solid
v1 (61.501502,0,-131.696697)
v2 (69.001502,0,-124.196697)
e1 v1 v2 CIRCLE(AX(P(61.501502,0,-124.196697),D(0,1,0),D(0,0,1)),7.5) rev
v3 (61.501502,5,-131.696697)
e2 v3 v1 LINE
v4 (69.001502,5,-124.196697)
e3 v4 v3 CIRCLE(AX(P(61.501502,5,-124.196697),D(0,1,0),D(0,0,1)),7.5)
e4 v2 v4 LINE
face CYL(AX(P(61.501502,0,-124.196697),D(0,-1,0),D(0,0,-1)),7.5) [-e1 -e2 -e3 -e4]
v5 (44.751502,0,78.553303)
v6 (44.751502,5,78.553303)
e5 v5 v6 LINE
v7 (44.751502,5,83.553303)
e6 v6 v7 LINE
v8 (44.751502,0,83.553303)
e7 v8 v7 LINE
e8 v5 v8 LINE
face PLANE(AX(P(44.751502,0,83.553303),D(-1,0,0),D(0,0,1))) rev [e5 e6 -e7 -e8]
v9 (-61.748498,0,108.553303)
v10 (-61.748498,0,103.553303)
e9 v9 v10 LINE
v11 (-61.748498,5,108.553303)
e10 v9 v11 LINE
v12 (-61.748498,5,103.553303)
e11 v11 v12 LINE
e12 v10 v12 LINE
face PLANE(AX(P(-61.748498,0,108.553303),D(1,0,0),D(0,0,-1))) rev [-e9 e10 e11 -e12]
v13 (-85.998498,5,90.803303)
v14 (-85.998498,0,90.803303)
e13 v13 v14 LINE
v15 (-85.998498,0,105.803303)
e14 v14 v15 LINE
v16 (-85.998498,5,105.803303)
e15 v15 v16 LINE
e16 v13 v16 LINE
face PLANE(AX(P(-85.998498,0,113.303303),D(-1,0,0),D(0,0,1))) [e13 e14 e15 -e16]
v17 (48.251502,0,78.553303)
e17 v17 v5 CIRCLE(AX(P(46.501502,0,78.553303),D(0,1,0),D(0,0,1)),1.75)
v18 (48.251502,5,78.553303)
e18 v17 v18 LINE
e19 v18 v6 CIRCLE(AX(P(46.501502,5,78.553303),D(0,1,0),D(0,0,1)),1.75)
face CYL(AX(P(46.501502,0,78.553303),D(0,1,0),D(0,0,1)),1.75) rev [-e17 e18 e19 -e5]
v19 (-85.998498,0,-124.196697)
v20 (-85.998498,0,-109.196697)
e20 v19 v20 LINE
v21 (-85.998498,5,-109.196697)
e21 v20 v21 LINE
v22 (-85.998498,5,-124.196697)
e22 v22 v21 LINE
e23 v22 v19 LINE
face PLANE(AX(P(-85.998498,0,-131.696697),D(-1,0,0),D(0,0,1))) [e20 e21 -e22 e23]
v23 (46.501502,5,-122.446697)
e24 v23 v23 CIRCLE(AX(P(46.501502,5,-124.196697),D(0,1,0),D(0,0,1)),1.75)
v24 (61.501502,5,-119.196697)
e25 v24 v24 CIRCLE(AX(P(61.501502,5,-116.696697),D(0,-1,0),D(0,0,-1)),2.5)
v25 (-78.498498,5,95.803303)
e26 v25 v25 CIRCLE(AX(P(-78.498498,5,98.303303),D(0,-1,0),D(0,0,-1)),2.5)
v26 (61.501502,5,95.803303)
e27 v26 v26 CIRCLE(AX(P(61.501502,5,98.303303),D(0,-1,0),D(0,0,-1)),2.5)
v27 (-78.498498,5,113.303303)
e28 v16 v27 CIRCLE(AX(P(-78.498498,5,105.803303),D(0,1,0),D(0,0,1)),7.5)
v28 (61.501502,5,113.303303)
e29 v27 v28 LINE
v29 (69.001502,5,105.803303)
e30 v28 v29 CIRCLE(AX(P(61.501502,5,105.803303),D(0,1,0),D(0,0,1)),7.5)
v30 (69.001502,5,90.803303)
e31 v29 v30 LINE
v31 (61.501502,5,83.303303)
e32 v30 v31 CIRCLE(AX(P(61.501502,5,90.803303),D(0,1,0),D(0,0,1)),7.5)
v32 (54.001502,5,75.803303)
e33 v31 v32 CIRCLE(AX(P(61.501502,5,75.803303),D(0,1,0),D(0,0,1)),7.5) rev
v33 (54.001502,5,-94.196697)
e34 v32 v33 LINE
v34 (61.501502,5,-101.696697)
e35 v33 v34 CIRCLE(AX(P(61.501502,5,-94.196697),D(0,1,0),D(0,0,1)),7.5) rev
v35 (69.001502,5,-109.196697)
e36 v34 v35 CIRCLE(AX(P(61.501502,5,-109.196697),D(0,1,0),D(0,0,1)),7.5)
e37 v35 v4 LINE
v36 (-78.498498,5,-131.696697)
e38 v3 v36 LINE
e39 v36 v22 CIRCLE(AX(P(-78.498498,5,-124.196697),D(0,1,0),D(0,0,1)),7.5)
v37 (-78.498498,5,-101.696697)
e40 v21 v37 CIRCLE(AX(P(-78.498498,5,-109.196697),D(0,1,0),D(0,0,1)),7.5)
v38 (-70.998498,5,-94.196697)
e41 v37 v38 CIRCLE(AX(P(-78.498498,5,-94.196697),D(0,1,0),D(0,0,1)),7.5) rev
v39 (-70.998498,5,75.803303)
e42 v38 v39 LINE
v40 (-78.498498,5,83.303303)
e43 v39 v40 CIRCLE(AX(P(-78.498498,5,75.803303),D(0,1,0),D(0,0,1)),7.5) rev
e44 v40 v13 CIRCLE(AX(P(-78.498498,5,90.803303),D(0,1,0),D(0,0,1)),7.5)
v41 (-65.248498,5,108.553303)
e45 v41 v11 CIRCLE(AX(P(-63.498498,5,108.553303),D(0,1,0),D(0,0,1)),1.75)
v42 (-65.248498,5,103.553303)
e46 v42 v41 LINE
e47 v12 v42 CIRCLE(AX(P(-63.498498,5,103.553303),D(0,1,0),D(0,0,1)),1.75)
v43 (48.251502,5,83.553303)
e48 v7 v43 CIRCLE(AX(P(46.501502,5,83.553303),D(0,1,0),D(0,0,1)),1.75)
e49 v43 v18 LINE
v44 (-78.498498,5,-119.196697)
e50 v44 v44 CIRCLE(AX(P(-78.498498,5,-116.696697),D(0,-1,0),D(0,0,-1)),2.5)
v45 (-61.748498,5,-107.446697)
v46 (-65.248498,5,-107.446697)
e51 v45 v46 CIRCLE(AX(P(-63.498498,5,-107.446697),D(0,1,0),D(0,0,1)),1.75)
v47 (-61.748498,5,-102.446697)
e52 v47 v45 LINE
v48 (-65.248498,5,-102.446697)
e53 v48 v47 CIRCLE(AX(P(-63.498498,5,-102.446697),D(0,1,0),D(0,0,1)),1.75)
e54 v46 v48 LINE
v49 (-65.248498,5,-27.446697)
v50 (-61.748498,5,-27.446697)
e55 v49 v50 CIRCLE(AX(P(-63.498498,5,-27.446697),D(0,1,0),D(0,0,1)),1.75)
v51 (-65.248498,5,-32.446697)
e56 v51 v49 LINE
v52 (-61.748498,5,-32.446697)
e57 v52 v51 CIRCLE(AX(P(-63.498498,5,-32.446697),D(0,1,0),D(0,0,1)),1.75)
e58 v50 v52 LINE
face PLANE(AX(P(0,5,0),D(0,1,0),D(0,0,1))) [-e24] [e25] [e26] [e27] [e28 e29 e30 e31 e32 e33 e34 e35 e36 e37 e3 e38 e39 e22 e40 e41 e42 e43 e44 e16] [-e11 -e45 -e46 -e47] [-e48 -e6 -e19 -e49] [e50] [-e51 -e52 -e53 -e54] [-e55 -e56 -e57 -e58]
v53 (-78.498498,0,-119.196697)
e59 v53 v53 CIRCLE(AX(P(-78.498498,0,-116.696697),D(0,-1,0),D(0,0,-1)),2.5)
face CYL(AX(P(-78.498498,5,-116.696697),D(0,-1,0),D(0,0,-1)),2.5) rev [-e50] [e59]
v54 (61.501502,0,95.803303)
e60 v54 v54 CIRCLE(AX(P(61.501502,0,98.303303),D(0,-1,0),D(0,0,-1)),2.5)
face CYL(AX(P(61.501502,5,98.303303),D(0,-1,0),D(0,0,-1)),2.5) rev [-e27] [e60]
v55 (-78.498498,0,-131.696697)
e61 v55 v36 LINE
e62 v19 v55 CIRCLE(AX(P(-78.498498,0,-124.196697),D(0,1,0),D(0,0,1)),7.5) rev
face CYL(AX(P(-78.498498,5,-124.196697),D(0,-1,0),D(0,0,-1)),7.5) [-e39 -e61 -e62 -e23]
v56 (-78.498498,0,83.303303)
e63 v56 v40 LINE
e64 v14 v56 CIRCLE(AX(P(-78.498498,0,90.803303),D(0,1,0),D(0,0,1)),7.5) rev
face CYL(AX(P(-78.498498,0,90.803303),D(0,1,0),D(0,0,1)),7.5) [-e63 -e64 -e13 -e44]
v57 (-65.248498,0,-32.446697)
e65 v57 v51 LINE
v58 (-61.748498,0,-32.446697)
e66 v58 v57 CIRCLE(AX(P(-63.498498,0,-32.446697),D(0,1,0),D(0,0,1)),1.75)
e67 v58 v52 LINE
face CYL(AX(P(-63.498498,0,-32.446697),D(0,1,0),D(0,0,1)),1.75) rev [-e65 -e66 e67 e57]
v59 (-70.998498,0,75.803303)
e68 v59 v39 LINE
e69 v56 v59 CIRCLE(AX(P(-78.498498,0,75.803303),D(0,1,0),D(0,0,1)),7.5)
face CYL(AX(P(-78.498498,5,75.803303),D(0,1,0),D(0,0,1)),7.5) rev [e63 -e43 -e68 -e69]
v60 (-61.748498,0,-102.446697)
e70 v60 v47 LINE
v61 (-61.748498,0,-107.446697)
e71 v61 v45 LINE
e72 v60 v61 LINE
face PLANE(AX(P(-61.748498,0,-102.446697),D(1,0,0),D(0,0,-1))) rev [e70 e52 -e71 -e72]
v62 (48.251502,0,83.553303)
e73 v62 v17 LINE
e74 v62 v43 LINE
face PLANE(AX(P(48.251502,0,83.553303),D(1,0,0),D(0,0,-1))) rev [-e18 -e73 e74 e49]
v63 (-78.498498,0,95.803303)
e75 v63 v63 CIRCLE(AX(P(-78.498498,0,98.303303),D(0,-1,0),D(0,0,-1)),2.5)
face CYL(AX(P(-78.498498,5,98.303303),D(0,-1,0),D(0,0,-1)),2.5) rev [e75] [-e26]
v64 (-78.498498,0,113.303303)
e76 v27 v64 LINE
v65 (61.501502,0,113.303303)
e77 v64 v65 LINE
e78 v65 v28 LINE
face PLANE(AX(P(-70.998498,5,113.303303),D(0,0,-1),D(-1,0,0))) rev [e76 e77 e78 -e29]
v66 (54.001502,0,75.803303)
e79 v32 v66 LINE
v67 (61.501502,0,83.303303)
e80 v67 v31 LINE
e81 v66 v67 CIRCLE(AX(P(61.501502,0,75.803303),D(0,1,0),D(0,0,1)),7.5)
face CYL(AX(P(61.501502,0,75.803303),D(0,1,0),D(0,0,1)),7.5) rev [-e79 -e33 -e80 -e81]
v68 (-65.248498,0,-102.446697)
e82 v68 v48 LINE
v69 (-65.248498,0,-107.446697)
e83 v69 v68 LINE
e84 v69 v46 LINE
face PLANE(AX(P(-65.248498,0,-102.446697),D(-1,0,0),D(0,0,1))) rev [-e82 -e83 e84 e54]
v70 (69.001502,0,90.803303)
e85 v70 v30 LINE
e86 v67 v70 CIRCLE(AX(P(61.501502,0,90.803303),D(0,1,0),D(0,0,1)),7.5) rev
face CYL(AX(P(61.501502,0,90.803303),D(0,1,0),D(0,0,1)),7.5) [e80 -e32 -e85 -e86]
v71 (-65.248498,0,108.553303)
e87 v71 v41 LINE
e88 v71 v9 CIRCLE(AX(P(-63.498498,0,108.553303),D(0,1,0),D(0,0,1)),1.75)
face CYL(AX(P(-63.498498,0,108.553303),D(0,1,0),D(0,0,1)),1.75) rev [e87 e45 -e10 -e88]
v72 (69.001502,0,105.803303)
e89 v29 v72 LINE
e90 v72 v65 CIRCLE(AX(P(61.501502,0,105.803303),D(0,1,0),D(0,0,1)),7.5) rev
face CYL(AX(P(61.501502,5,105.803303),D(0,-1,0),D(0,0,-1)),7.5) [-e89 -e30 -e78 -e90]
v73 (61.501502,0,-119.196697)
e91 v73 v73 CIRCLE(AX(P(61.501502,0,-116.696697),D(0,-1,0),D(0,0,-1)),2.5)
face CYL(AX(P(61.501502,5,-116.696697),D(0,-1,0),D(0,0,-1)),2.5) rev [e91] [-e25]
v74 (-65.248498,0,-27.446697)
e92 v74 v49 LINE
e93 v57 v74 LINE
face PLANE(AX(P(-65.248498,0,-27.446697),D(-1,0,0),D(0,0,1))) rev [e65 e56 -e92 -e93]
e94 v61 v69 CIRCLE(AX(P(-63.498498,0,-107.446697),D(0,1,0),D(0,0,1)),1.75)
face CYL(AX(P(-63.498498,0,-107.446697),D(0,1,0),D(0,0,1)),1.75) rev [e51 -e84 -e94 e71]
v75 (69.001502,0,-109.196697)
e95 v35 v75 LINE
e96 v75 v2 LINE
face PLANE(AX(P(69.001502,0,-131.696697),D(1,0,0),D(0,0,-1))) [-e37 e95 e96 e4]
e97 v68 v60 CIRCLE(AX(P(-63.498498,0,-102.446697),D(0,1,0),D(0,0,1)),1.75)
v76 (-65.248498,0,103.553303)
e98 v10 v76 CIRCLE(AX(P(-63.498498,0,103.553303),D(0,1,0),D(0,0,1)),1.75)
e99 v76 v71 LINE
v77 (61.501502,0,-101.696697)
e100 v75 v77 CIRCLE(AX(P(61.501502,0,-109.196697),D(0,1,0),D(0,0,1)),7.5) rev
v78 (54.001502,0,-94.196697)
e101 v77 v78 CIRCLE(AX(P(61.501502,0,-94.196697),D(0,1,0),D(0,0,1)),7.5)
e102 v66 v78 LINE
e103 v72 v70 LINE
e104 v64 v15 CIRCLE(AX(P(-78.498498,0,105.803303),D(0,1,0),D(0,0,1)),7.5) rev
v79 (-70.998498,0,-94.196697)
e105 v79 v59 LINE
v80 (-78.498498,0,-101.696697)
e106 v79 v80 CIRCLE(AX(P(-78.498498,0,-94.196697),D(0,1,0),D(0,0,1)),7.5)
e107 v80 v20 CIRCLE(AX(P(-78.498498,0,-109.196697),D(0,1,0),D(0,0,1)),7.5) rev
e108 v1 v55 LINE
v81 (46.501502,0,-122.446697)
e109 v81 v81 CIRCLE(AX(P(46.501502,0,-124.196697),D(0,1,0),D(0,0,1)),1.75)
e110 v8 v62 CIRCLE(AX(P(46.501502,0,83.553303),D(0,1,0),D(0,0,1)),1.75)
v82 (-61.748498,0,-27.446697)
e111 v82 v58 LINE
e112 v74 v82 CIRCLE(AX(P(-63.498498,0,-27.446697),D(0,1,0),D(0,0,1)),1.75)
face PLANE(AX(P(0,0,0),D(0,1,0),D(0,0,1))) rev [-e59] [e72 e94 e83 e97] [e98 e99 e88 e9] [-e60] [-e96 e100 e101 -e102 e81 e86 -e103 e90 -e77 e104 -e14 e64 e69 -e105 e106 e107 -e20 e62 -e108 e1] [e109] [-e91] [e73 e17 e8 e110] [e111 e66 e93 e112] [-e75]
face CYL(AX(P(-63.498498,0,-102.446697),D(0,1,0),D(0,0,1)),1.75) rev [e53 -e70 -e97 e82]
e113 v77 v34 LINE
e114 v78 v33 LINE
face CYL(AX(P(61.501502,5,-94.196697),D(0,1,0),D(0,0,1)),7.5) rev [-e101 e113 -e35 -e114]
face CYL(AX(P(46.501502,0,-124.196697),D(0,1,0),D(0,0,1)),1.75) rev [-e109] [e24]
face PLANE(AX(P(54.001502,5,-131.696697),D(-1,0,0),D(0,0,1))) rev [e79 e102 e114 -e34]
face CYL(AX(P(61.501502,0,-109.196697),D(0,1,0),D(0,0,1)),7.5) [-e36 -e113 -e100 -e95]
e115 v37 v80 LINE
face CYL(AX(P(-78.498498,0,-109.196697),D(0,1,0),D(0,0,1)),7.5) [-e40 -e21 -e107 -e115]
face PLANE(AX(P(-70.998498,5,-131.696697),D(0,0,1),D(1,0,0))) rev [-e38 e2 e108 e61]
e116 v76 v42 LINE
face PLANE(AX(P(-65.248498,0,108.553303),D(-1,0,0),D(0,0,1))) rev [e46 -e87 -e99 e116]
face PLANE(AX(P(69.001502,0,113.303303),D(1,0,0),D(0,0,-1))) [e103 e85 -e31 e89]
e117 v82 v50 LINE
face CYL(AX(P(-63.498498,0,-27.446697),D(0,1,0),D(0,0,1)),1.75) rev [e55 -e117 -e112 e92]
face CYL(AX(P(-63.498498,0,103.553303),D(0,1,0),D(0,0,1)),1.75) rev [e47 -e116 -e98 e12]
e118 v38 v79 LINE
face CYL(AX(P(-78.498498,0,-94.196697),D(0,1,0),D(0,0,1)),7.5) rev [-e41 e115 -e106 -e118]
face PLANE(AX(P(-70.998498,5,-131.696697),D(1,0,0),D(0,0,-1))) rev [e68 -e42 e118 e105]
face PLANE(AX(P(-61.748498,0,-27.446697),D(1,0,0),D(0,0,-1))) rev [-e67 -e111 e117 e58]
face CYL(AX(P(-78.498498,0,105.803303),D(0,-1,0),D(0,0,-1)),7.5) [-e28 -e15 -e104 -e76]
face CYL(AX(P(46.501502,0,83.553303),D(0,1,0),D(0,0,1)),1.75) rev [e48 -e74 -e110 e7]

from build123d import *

# Parameters (mm, degrees)
SKETCH1_W           = 125
SKETCH1_H           = 245
BOSS_EXTRUDE1_DEPTH = 5
SKETCH2_W           = 15
SKETCH2_H           = 30
BOSS_EXTRUDE2_DEPTH = 5
SKETCH3_R           = 2.5
CUT_EXTRUDE1_DEPTH  = 158.368235883
SKETCH4_R           = 1.75
CUT_EXTRUDE2_DEPTH  = 158.368235883
FILLET4_R           = 7.5


with BuildPart() as part:
    # Sketch1 → Boss-Extrude1 (new body)
    with BuildSketch(Plane(origin=(0, 0, 0), x_dir=(1, 0, 0), z_dir=(0, 1, 0))):
        with Locations((-8.498498498, 9.196696697)):
            Rectangle(SKETCH1_W, SKETCH1_H)
    extrude(amount=BOSS_EXTRUDE1_DEPTH)

    # Sketch2 → Boss-Extrude2 (add)
    with BuildSketch(Plane(origin=(0, 5, 0), x_dir=(1, 0, 0), z_dir=(0, 1, 0))):
        with Locations((61.501501502, 116.696696697)):
            Rectangle(SKETCH2_W, SKETCH2_H)
        with Locations((-78.498498498, 116.696696697)):
            Rectangle(SKETCH2_W, SKETCH2_H)
        with Locations((-78.498498498, -98.303303303)):
            Rectangle(SKETCH2_W, SKETCH2_H)
        with Locations((61.501501502, -98.303303303)):
            Rectangle(SKETCH2_W, SKETCH2_H)
    extrude(amount=-BOSS_EXTRUDE2_DEPTH)

    # Sketch3 → Cut-Extrude1 (cut, through all)
    with BuildSketch(Plane.XZ):
        with Locations(Location((-78.498498498, 98.303303303, 0), (0, 0, 270))):
            Circle(SKETCH3_R)
        with Locations(Location((61.501501502, 98.303303303, 0), (0, 0, 270))):
            Circle(SKETCH3_R)
        with Locations(Location((-78.498498498, -116.696696697, 0), (0, 0, 270))):
            Circle(SKETCH3_R)
        with Locations(Location((61.501501502, -116.696696697, 0), (0, 0, 270))):
            Circle(SKETCH3_R)
    extrude(amount=-CUT_EXTRUDE1_DEPTH, mode=Mode.SUBTRACT)

    # Sketch4 → Cut-Extrude2 (cut, through all)
    with BuildSketch(Plane(origin=(0, 5, 0), x_dir=(1, 0, 0), z_dir=(0, 1, 0))):
        with Locations(Location((46.501501502, 124.196696697, 0), (0, 0, 270))):
            Circle(SKETCH4_R)
        with BuildLine():
            Line((44.751501502, -83.553303303), (44.751501502, -78.553303303))
            ThreePointArc((44.751501502, -78.553303303), (46.501501502, -76.803303303), (48.251501502, -78.553303303))
            Line((48.251501502, -78.553303303), (48.251501502, -83.553303303))
            ThreePointArc((48.251501502, -83.553303303), (46.501501502, -85.303303303), (44.751501502, -83.553303303))
        make_face()
        with BuildLine():
            Line((-65.248498498, -108.553303303), (-65.248498498, -103.553303303))
            ThreePointArc((-65.248498498, -103.553303303), (-63.498498498, -101.803303303), (-61.748498498, -103.553303303))
            Line((-61.748498498, -103.553303303), (-61.748498498, -108.553303303))
            ThreePointArc((-61.748498498, -108.553303303), (-63.498498498, -110.303303303), (-65.248498498, -108.553303303))
        make_face()
        with BuildLine():
            Line((-65.248498498, 27.446696697), (-65.248498498, 32.446696697))
            ThreePointArc((-65.248498498, 32.446696697), (-63.498498498, 34.196696697), (-61.748498498, 32.446696697))
            Line((-61.748498498, 32.446696697), (-61.748498498, 27.446696697))
            ThreePointArc((-61.748498498, 27.446696697), (-63.498498498, 25.696696697), (-65.248498498, 27.446696697))
        make_face()
        with BuildLine():
            Line((-65.248498498, 102.446696697), (-65.248498498, 107.446696697))
            ThreePointArc((-65.248498498, 107.446696697), (-63.498498498, 109.196696697), (-61.748498498, 107.446696697))
            Line((-61.748498498, 107.446696697), (-61.748498498, 102.446696697))
            ThreePointArc((-61.748498498, 102.446696697), (-63.498498498, 100.696696697), (-65.248498498, 102.446696697))
        make_face()
    extrude(amount=-CUT_EXTRUDE2_DEPTH, mode=Mode.SUBTRACT)

    # Fillet4
    fillet4_edges = [part.edges().sort_by_distance(p)[0] for p in [
        (-70.998498498, 2.5, 83.303303303),
        (-85.998498498, 2.5, 83.303303303),
        (-85.998498498, 2.5, 113.303303303),
        (69.001501502, 2.5, 113.303303303),
        (69.001501502, 2.5, 83.303303303),
        (54.001501502, 2.5, 83.303303303),
        (54.001501502, 2.5, -101.696696697),
        (69.001501502, 2.5, -101.696696697),
        (69.001501502, 2.5, -131.696696697),
        (-85.998498498, 2.5, -131.696696697),
        (-70.998498498, 2.5, -101.696696697),
        (-85.998498498, 2.5, -101.696696697),
    ]]
    fillet(fillet4_edges, radius=FILLET4_R - 0.0001)  # a hair under: the kernel refuses the full size


solid = part.part
